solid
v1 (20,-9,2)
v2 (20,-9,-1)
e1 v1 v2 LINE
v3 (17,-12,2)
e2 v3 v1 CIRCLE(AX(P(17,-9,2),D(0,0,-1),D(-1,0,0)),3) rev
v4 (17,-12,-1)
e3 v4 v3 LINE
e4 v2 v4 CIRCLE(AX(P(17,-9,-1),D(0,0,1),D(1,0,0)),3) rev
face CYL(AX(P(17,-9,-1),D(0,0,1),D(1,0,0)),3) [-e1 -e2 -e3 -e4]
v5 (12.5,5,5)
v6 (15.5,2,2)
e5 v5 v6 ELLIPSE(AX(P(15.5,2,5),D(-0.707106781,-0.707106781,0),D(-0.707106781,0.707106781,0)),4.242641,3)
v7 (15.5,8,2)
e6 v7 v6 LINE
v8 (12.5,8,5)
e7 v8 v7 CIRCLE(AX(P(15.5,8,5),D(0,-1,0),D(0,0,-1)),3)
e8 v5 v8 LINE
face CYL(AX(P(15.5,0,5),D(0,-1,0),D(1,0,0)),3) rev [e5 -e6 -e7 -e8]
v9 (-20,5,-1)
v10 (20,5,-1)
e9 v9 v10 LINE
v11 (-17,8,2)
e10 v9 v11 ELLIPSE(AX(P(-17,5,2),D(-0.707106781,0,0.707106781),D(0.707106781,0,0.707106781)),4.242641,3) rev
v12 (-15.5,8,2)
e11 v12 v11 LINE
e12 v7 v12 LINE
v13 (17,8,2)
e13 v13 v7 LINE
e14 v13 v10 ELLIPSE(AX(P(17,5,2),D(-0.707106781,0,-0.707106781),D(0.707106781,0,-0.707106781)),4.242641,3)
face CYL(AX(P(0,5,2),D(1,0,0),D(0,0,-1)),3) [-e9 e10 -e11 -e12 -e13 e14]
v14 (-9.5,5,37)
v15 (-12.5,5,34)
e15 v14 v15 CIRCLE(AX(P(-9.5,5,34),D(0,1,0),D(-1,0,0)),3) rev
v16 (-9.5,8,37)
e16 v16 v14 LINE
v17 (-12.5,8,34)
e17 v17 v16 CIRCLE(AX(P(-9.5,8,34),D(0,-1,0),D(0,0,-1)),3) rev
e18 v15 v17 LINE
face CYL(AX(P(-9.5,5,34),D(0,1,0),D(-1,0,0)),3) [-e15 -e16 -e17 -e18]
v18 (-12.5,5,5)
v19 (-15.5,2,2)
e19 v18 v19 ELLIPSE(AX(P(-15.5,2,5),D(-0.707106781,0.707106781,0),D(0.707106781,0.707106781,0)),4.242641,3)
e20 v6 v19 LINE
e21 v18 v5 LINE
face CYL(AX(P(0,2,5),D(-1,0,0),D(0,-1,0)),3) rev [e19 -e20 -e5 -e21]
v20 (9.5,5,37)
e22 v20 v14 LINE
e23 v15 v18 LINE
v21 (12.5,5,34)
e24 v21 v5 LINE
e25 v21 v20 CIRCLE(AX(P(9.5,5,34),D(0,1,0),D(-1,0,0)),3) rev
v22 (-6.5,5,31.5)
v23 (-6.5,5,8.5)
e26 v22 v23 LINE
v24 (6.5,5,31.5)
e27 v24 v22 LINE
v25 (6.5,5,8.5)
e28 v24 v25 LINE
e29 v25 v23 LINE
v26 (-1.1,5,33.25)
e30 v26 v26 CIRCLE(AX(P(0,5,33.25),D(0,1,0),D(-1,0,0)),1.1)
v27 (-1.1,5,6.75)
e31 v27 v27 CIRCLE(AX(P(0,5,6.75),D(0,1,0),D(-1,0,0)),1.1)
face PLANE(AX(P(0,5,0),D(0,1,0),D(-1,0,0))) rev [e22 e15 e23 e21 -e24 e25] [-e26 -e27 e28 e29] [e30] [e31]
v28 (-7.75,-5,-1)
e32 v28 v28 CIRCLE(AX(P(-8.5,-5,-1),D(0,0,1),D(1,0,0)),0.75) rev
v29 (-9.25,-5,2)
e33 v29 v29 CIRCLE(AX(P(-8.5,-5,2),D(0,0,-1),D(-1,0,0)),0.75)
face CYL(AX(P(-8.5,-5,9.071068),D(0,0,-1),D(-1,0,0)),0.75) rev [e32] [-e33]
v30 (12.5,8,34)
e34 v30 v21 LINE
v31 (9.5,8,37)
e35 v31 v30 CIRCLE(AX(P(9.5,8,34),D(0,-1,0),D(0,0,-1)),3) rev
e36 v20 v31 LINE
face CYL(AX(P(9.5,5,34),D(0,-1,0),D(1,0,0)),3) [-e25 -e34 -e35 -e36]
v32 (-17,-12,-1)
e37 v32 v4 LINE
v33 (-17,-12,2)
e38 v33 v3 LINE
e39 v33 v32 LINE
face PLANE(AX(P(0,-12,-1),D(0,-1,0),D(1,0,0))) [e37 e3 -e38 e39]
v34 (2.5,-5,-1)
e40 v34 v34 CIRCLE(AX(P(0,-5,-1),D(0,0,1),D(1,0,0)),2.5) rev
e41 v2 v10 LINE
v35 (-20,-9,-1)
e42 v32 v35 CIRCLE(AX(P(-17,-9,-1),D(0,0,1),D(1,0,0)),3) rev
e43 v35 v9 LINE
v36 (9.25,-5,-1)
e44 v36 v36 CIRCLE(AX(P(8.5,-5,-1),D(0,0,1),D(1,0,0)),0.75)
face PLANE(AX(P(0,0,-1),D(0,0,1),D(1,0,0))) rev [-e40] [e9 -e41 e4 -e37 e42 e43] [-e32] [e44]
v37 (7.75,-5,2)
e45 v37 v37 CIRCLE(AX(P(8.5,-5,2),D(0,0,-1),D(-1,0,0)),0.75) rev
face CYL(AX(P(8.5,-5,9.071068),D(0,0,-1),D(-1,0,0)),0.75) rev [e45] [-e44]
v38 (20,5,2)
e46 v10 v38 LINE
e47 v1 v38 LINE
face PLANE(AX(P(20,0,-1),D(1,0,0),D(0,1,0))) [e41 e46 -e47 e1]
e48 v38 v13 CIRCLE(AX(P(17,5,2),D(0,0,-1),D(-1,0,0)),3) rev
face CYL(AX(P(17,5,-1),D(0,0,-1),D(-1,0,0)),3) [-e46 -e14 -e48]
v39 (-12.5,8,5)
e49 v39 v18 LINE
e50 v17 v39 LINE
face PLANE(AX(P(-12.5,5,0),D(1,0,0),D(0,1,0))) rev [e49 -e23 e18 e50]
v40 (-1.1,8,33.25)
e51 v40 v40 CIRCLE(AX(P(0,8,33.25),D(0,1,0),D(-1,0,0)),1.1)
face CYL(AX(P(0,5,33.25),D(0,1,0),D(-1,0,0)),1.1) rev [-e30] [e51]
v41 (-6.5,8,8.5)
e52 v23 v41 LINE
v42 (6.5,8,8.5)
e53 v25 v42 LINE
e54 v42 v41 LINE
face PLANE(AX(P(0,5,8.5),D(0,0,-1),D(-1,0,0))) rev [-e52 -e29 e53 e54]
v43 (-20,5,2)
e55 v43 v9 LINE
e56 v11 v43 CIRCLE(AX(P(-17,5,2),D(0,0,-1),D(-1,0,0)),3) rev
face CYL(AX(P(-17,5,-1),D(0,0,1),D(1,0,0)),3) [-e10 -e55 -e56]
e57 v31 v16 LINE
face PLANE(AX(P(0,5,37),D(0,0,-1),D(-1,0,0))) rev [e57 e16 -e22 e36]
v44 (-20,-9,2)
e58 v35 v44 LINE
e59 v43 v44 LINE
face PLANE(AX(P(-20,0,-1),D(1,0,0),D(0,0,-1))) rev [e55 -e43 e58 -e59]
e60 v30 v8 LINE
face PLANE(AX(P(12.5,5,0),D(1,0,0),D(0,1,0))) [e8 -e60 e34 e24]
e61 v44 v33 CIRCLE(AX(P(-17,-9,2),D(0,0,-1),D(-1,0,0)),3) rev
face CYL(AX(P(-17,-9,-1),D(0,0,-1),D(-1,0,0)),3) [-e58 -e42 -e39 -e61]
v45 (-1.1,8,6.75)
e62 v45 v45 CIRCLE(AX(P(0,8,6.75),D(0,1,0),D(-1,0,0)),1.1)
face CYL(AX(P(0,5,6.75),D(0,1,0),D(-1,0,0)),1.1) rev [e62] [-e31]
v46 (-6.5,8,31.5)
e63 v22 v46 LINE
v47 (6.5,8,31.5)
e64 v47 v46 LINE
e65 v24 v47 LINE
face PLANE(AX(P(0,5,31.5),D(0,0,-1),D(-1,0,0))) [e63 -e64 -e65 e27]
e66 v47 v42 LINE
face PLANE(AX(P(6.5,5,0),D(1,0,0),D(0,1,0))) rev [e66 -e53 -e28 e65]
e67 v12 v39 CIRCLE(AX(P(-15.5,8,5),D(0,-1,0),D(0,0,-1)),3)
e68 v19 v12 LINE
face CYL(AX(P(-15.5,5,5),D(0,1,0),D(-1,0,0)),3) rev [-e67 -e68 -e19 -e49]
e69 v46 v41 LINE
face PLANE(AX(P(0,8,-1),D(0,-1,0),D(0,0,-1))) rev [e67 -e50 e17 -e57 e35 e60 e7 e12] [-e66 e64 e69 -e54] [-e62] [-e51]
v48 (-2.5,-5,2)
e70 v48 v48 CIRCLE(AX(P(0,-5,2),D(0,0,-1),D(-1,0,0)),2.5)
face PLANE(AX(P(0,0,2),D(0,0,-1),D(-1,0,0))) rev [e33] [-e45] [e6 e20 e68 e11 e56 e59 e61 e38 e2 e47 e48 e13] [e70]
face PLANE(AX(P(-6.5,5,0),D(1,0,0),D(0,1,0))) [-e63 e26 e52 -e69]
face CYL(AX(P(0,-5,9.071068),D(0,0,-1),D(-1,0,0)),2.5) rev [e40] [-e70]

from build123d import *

# Parameters (mm, degrees)
ESBO_O1_W                         = 40
ESBO_O1_H                         = 20
RESSALTO_EXTRUS_O1_DEPTH          = 1
ESBO_O3_W                         = 40
ESBO_O3_H                         = 20
RESSALTO_EXTRUS_O2_DEPTH          = 2
CORTE_EXTRUS_O1_REACH             = 25.409
ESBO_O2_R                         = 2.5
ESBO_O2_R_2                       = 0.75
CORTE_EXTRUS_O1_DIRECTION_2_REACH = 25.409
ESBO_O4_W                         = 25
ESBO_O4_H                         = 35
ESBO_O4_R                         = 1.1
ESBO_O4_W_2                       = 13
ESBO_O4_H_2                       = 23
ESBO_O4_H_3                       = 3
RESSALTO_EXTRUS_O3_DEPTH          = 3
FILLET2_R                         = 3


with BuildPart() as part:
    # Esboço1 → Ressalto-extrusão1 (new body)
    with BuildSketch(Plane.XY):
        with Locations((0, -2)):
            Rectangle(ESBO_O1_W, ESBO_O1_H)
    extrude(amount=-RESSALTO_EXTRUS_O1_DEPTH)

    # Esboço3 → Ressalto-extrusão2 (add)
    with BuildSketch(Plane.XY):
        with Locations((0, -2)):
            Rectangle(ESBO_O3_W, ESBO_O3_H)
    extrude(amount=RESSALTO_EXTRUS_O2_DEPTH)

    # Corte-extrusão1: up to this face of the body (flat: up to its plane)
    corte_extrus_o1_end = Plane(part.part.faces().sort_by_distance((0, -2, 2))[0])
    # Esboço2 → Corte-extrusão1 (cut, up to the picked face)
    with BuildSketch(Plane.XY, mode=Mode.PRIVATE) as corte_extrus_o1_sk1:
        with Locations(Location((0, -5, 0), (0, 0, 180))):
            Circle(ESBO_O2_R)
    corte_extrus_o1_tool1 = split(extrude(corte_extrus_o1_sk1.sketch, amount=CORTE_EXTRUS_O1_REACH, mode=Mode.PRIVATE), bisect_by=corte_extrus_o1_end, keep=Keep.BOTH, mode=Mode.PRIVATE)
    # Esboço2 → Corte-extrusão1 (cut, up to the picked face)
    with BuildSketch(Plane.XY, mode=Mode.PRIVATE) as corte_extrus_o1_sk2:
        with Locations(Location((-8.5, -5, 0), (0, 0, 180))):
            Circle(ESBO_O2_R_2)
    corte_extrus_o1_tool2 = split(extrude(corte_extrus_o1_sk2.sketch, amount=CORTE_EXTRUS_O1_REACH, mode=Mode.PRIVATE), bisect_by=corte_extrus_o1_end, keep=Keep.BOTH, mode=Mode.PRIVATE)
    corte_extrus_o1_1 = corte_extrus_o1_tool1.solids().sort_by(Axis((0, -5, 0), (0, 0, 1)))[0]
    add(corte_extrus_o1_1, mode=Mode.SUBTRACT)
    corte_extrus_o1_2 = corte_extrus_o1_tool2.solids().sort_by(Axis((-8.5, -5, 0), (0, 0, 1)))[0]
    add(corte_extrus_o1_2, mode=Mode.SUBTRACT)
    corte_extrus_o1 = corte_extrus_o1_1 + corte_extrus_o1_2  # Corte-extrusão1 as one shape, for the pattern or mirror that repeats it

    # Corte-extrusão1 direction 2: up to this face of the body (flat: up to its plane)
    corte_extrus_o1_direction_2_end = Plane(part.part.faces().sort_by_distance((0, -2, -1))[0])
    # Esboço2 → Corte-extrusão1 direction 2 (cut, up to the picked face)
    with BuildSketch(Plane.XY, mode=Mode.PRIVATE) as corte_extrus_o1_direction_2_sk1:
        with Locations(Location((0, -5, 0), (0, 0, 180))):
            Circle(ESBO_O2_R)
    corte_extrus_o1_direction_2_tool1 = split(extrude(corte_extrus_o1_direction_2_sk1.sketch, amount=-CORTE_EXTRUS_O1_DIRECTION_2_REACH, mode=Mode.PRIVATE), bisect_by=corte_extrus_o1_direction_2_end, keep=Keep.BOTH, mode=Mode.PRIVATE)
    # Esboço2 → Corte-extrusão1 direction 2 (cut, up to the picked face)
    with BuildSketch(Plane.XY, mode=Mode.PRIVATE) as corte_extrus_o1_direction_2_sk2:
        with Locations(Location((-8.5, -5, 0), (0, 0, 180))):
            Circle(ESBO_O2_R_2)
    corte_extrus_o1_direction_2_tool2 = split(extrude(corte_extrus_o1_direction_2_sk2.sketch, amount=-CORTE_EXTRUS_O1_DIRECTION_2_REACH, mode=Mode.PRIVATE), bisect_by=corte_extrus_o1_direction_2_end, keep=Keep.BOTH, mode=Mode.PRIVATE)
    corte_extrus_o1_direction_2_1 = corte_extrus_o1_direction_2_tool1.solids().sort_by(Axis((0, -5, 0), (0, 0, -1)))[0]
    add(corte_extrus_o1_direction_2_1, mode=Mode.SUBTRACT)
    corte_extrus_o1_direction_2_2 = corte_extrus_o1_direction_2_tool2.solids().sort_by(Axis((-8.5, -5, 0), (0, 0, -1)))[0]
    add(corte_extrus_o1_direction_2_2, mode=Mode.SUBTRACT)
    corte_extrus_o1_direction_2 = corte_extrus_o1_direction_2_1 + corte_extrus_o1_direction_2_2  # Corte-extrusão1 direction 2 as one shape, for the pattern or mirror that repeats it

    # Esboço4 → Ressalto-extrusão3 (add)
    # profile 1 of 2: a face of its own
    with BuildSketch(Plane(origin=(0, 8, 0), x_dir=(1, 0, 0), z_dir=(0, 1, 0))):
        with Locations((0, -19.5)):
            Rectangle(ESBO_O4_W, ESBO_O4_H)
        with Locations(Location((0, -33.25, 0), (0, 0, 180))):
            Circle(ESBO_O4_R, mode=Mode.SUBTRACT)
        with Locations((0, -20)):
            Rectangle(ESBO_O4_W_2, ESBO_O4_H_2, mode=Mode.SUBTRACT)
        with Locations(Location((0, -6.75, 0), (0, 0, 180))):
            Circle(ESBO_O4_R, mode=Mode.SUBTRACT)
    # profile 2 of 2: a face of its own
    with BuildSketch(Plane(origin=(0, 8, 0), x_dir=(1, 0, 0), z_dir=(0, 1, 0))):
        with Locations((0, -0.5)):
            Rectangle(ESBO_O4_W, ESBO_O4_H_3)
    extrude(amount=-RESSALTO_EXTRUS_O3_DEPTH)

    # Mirror1: Corte-extrusão1, Corte-extrusão1 direction 2 across plane
    add(corte_extrus_o1.mirror(Plane(origin=(0, 0, 0), x_dir=(0, 0, 1), z_dir=(1, 0, 0))), mode=Mode.SUBTRACT)
    add(corte_extrus_o1_direction_2.mirror(Plane(origin=(0, 0, 0), x_dir=(0, 0, 1), z_dir=(1, 0, 0))), mode=Mode.SUBTRACT)

    # Fillet2
    fillet2_edges = [part.edges().sort_by_distance(p)[0] for p in [
        (0, 8, -1),
        (0, 5, 2),
        (12.5, 6.5, 2),
        (-12.5, 6.5, 2),
        (-12.5, 6.5, 37),
        (12.5, 6.5, 37),
        (-20, -12, 0.5),
        (-20, 8, 0.5),
        (20, 8, 0.5),
        (20, -12, 0.5),
    ]]
    fillet(fillet2_edges, radius=FILLET2_R - 0.0001)  # a hair under: the kernel refuses the full size


solid = part.part
